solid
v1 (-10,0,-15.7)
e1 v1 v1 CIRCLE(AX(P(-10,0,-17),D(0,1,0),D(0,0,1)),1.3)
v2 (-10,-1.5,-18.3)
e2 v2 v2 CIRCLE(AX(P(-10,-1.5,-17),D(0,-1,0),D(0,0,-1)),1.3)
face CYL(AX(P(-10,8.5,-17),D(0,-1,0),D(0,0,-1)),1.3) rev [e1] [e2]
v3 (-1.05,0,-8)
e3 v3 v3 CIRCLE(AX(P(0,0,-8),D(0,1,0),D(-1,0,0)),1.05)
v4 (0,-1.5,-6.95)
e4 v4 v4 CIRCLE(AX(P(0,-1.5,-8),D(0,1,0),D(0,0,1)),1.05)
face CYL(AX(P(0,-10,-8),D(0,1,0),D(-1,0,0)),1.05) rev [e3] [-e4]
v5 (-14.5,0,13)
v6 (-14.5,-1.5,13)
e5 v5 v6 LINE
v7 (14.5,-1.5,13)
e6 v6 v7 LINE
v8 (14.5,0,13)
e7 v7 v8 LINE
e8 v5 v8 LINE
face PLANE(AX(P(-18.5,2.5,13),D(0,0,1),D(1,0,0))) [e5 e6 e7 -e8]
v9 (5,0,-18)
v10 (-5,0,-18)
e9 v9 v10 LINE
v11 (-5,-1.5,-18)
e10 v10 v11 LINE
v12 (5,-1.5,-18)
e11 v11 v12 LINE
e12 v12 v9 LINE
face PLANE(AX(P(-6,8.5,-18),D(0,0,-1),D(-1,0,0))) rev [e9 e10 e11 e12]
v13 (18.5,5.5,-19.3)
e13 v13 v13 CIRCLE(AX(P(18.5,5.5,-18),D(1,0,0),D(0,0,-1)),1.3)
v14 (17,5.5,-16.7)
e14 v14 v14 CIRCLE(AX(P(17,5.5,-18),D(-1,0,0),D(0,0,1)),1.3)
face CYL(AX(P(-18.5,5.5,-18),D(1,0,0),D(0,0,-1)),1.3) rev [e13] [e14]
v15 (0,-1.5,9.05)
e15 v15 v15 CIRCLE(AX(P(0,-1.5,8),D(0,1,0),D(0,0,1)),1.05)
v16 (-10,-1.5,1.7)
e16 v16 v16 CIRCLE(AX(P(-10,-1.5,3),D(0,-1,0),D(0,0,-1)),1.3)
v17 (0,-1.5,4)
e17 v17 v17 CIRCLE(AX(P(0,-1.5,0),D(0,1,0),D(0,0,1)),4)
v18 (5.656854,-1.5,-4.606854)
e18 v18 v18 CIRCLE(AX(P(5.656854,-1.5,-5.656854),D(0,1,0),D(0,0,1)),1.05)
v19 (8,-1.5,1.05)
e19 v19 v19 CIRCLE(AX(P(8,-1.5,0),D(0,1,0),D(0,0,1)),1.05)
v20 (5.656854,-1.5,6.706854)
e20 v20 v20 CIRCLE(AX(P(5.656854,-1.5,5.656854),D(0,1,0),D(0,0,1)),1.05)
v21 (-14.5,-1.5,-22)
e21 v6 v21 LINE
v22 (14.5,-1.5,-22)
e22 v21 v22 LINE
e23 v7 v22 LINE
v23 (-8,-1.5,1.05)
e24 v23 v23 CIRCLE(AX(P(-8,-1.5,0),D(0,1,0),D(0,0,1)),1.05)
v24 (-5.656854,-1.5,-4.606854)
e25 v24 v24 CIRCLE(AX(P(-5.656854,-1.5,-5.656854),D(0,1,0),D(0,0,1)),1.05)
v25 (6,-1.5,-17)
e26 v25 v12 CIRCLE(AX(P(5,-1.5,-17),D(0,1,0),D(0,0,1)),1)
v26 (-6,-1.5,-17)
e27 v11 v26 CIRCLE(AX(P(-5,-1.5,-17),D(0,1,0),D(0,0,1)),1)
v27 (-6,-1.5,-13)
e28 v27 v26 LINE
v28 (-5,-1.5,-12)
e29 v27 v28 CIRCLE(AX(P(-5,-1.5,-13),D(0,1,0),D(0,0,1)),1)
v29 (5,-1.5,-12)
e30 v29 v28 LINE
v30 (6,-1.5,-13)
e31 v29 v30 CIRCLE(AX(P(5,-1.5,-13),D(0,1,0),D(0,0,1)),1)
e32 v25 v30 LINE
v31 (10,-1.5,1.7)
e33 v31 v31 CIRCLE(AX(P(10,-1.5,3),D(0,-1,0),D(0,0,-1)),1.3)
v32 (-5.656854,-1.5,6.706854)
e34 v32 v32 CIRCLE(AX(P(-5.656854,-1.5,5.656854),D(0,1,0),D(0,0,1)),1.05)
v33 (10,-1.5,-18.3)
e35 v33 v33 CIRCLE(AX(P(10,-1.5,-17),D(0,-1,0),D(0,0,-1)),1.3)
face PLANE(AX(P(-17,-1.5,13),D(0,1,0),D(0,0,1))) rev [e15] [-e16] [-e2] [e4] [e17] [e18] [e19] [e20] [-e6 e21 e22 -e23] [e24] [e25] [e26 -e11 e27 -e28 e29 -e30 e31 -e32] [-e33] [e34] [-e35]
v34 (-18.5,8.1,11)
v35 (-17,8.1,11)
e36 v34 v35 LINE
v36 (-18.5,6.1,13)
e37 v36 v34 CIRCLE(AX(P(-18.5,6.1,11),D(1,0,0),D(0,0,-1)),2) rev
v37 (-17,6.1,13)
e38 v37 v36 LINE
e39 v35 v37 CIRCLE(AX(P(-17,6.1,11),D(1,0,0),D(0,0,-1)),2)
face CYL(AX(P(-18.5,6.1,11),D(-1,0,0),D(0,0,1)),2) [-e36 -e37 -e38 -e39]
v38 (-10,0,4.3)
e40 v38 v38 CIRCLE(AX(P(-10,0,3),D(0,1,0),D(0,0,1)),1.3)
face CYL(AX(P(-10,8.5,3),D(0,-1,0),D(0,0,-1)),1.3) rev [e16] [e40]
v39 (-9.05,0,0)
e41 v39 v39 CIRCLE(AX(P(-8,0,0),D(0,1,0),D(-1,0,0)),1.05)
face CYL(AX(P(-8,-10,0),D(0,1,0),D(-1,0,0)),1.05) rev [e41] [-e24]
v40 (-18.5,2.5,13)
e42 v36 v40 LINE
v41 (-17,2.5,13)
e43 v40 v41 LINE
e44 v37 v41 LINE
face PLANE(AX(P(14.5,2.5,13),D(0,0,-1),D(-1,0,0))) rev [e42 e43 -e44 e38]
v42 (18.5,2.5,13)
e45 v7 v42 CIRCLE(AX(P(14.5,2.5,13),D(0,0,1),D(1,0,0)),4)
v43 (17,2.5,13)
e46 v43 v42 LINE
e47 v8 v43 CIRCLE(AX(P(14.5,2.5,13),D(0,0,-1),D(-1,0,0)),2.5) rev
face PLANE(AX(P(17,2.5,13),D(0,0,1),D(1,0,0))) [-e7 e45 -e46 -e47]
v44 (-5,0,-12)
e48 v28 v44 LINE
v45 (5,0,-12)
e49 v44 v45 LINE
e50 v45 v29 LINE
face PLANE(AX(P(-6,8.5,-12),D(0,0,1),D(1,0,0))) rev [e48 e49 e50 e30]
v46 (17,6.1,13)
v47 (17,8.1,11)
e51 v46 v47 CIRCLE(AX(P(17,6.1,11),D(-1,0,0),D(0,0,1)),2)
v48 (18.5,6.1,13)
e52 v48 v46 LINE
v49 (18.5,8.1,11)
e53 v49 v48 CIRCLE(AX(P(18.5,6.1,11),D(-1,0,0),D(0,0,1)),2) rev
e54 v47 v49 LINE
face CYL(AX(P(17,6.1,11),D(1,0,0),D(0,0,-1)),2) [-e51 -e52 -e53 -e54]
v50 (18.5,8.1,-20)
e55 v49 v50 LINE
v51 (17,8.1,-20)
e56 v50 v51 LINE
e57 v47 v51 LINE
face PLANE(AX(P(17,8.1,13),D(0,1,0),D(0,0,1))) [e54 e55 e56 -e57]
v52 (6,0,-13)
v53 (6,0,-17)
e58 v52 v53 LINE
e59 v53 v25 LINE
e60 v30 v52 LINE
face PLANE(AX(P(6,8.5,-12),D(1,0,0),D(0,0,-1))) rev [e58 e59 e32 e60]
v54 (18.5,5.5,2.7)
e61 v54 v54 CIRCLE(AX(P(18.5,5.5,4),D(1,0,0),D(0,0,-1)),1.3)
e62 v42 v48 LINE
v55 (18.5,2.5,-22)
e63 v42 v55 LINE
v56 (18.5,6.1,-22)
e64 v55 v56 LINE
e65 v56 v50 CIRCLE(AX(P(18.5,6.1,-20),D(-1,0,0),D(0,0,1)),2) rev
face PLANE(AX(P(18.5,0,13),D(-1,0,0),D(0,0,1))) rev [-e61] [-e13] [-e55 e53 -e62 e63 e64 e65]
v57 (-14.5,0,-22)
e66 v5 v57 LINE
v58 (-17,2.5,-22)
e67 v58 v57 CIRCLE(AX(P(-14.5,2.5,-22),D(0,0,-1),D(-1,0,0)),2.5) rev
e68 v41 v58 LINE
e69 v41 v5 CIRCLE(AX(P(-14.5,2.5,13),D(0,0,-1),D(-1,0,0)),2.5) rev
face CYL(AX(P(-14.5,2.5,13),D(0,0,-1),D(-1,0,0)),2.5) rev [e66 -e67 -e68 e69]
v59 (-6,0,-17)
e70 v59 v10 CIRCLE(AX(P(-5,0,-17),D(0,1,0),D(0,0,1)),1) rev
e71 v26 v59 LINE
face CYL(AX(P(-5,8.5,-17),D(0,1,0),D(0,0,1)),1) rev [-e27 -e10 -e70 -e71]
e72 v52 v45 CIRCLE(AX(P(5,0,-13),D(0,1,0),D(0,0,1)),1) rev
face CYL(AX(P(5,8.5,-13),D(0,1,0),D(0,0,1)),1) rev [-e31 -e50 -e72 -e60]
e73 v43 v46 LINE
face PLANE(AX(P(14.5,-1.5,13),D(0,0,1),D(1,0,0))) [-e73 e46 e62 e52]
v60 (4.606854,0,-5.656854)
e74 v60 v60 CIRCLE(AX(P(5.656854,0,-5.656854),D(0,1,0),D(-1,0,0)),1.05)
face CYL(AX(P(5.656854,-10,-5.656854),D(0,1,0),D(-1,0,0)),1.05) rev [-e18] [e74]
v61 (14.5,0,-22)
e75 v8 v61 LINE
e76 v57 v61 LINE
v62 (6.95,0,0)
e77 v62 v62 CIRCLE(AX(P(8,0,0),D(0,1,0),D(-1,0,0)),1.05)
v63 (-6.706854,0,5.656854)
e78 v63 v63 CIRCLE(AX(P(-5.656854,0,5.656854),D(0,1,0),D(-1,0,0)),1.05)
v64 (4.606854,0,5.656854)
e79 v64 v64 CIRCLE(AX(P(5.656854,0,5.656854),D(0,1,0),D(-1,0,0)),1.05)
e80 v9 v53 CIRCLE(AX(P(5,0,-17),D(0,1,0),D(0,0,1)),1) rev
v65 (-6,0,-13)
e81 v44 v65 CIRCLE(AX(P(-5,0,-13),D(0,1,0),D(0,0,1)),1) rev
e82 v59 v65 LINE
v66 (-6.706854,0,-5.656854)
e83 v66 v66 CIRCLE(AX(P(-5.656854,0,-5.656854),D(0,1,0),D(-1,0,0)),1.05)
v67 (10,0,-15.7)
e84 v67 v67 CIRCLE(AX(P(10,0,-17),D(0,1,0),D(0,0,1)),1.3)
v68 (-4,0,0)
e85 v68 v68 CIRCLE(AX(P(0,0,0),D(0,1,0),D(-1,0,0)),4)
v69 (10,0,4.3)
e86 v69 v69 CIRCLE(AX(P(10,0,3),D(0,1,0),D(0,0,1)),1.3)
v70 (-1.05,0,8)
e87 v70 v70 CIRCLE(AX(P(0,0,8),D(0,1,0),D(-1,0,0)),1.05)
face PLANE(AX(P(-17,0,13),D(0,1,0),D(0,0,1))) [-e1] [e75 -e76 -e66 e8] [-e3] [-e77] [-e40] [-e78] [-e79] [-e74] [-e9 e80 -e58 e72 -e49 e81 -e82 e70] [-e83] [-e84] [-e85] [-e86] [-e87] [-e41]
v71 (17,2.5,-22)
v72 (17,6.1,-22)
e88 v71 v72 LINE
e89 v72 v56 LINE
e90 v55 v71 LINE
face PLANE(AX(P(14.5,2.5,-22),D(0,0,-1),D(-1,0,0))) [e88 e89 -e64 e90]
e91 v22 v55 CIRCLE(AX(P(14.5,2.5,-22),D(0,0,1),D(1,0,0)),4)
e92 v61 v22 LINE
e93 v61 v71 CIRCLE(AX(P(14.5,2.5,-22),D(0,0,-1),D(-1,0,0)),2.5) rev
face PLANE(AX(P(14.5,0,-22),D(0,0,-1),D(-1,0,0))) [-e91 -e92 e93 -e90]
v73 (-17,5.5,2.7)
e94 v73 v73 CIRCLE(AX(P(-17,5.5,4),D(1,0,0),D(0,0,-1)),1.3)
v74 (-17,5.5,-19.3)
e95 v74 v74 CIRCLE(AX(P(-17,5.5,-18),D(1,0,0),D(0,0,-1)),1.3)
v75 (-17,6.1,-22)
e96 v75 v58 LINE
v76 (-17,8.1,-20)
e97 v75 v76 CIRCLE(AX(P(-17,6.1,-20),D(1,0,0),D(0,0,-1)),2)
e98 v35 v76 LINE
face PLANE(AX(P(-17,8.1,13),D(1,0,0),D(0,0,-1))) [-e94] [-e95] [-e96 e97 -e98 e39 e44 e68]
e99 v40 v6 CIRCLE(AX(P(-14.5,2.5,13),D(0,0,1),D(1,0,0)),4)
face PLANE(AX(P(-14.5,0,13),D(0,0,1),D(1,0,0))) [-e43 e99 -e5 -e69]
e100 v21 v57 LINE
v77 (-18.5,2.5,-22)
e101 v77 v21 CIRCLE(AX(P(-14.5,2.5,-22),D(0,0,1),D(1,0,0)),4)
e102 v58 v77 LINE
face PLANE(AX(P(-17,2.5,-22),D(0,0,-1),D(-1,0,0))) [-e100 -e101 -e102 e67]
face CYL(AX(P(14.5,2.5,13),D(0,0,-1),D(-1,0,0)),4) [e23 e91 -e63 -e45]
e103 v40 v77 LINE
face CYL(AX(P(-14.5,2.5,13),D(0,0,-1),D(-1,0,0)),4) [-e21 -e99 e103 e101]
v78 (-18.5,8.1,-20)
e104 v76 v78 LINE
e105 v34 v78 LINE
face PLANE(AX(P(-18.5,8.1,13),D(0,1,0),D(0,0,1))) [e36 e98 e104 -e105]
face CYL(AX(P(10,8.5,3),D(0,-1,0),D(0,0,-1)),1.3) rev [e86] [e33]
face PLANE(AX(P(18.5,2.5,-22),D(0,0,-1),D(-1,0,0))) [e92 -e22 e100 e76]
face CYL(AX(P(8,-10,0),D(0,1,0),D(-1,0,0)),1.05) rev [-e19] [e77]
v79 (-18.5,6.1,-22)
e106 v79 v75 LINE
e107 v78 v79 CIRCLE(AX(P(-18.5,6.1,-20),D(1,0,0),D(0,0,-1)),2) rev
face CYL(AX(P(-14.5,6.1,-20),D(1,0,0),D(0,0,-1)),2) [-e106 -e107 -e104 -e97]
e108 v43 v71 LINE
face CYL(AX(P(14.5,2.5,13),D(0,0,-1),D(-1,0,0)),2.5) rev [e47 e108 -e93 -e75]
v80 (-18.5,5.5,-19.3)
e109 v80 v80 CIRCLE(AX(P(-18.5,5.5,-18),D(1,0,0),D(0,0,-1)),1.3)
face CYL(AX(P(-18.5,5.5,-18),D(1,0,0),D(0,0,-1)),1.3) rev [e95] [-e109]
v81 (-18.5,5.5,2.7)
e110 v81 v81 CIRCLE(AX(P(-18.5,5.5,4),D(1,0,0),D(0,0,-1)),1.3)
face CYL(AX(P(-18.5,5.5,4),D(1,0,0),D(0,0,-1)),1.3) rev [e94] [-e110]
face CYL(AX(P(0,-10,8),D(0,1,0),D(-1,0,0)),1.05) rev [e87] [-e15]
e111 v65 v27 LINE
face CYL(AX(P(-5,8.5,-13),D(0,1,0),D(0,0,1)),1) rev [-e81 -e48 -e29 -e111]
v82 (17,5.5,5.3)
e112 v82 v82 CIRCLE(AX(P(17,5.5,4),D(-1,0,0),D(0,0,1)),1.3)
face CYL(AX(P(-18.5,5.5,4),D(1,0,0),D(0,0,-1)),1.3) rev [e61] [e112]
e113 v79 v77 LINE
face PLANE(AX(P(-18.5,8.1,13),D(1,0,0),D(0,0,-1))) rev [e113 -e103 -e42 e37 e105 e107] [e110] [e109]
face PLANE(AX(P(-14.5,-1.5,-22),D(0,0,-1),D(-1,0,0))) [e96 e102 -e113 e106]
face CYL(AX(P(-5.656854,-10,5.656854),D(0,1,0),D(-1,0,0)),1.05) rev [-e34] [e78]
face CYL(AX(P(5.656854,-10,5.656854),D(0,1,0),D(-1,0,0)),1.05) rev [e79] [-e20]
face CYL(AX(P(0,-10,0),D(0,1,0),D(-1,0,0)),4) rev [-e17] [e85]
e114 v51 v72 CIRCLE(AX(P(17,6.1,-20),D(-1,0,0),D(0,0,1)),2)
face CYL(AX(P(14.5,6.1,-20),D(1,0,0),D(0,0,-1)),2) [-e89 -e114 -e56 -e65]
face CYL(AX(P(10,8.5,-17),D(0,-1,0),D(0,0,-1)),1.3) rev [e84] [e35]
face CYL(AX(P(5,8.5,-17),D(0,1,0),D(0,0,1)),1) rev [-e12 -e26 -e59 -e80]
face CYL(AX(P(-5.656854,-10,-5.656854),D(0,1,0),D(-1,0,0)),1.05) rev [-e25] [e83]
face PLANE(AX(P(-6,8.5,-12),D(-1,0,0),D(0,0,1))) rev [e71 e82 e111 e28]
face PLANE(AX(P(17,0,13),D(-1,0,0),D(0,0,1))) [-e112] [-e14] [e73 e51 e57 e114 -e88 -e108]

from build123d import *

# Parameters (mm, degrees)
BASE_FLANGE1_DEPTH      = 13
BASE_FLANGE1_DEPTH_BACK = 22
SKETCH5_R               = 4
SKETCH5_R_2             = 1.05
CUT_EXTRUDE1_DEPTH      = 10
CUT_EXTRUDE2_DEPTH      = 30.864025181
CUT_EXTRUDE2_DEPTH_BACK = 30.864025181
SKETCH7_R               = 1.3
FILLET1_R               = 2
SKETCH8_R               = 1.3
CUT_EXTRUDE3_DEPTH      = 10
SKETCH9_W               = 12
SKETCH9_H               = 6
CUT_EXTRUDE4_DEPTH      = 10
FILLET2_R               = 1


# Sheet-metal steps are written as plain solids
with BuildPart() as part:
    # Sketch1 → Base-Flange1 (new, two sides: drawn at the far end of the back side and taken through both)
    with BuildSketch(Plane.XY.offset(-BASE_FLANGE1_DEPTH_BACK)):
        with BuildLine():
            Line((-17, 8.1), (-17, 2.5))
            ThreePointArc((-17, 2.5), (-16.267766953, 0.732233047), (-14.5, 0))
            Line((-14.5, 0), (14.5, 0))
            ThreePointArc((14.5, 0), (16.267766953, 0.732233047), (17, 2.5))
            Line((17, 2.5), (17, 8.1))
            Line((17, 8.1), (18.5, 8.1))
            Line((18.5, 8.1), (18.5, 2.5))
            ThreePointArc((18.5, 2.5), (17.328427125, -0.328427125), (14.5, -1.5))
            Line((14.5, -1.5), (-14.5, -1.5))
            ThreePointArc((-14.5, -1.5), (-17.328427125, -0.328427125), (-18.5, 2.5))
            Line((-18.5, 2.5), (-18.5, 8.1))
            Line((-18.5, 8.1), (-17, 8.1))
        make_face()
    extrude(amount=BASE_FLANGE1_DEPTH + BASE_FLANGE1_DEPTH_BACK)

    # Sketch5 → Cut-Extrude1 (cut)
    with BuildSketch(Plane(origin=(0, 0, 0), x_dir=(1, 0, 0), z_dir=(0, 1, 0))):
        with Locations(Location((0, 0, 0), (0, 0, 180))):
            Circle(SKETCH5_R)
        with Locations(Location((0, 8, 0), (0, 0, 180))):
            Circle(SKETCH5_R_2)
        with Locations(Location((5.656854249, 5.656854249, 0), (0, 0, 180))):
            Circle(SKETCH5_R_2)
        with Locations(Location((8, 0, 0), (0, 0, 180))):
            Circle(SKETCH5_R_2)
        with Locations(Location((5.656854249, -5.656854249, 0), (0, 0, 180))):
            Circle(SKETCH5_R_2)
        with Locations(Location((0, -8, 0), (0, 0, 180))):
            Circle(SKETCH5_R_2)
        with Locations(Location((-5.656854249, -5.656854249, 0), (0, 0, 180))):
            Circle(SKETCH5_R_2)
        with Locations(Location((-8, 0, 0), (0, 0, 180))):
            Circle(SKETCH5_R_2)
        with Locations(Location((-5.656854249, 5.656854249, 0), (0, 0, 180))):
            Circle(SKETCH5_R_2)
    extrude(amount=-CUT_EXTRUDE1_DEPTH, mode=Mode.SUBTRACT)

    # Sketch7 → Cut-Extrude2 (cut, two sides: drawn at the far end of the back side and taken through both)
    with BuildSketch(Plane(origin=(0, 0, 0), x_dir=(0, 0, -1), z_dir=(1, 0, 0)).offset(-CUT_EXTRUDE2_DEPTH_BACK)):
        with Locations((-4, 5.5)):
            Circle(SKETCH7_R)
        with Locations((18, 5.5)):
            Circle(SKETCH7_R)
    extrude(amount=CUT_EXTRUDE2_DEPTH + CUT_EXTRUDE2_DEPTH_BACK, mode=Mode.SUBTRACT)

    # Fillet1
    fillet1_edges = [part.edges().sort_by_distance(p)[0] for p in [
        (-17.75, 8.1, 13),
        (-17.75, 8.1, -22),
        (17.75, 8.1, -22),
        (17.75, 8.1, 13),
    ]]
    fillet(fillet1_edges, radius=FILLET1_R)

    # Sketch8 → Cut-Extrude3 (cut)
    with BuildSketch(Plane.XZ.offset(1.5)):
        with Locations(Location((-10, 3, 0), (0, 0, 270))):
            Circle(SKETCH8_R)
        with Locations(Location((10, 3, 0), (0, 0, 270))):
            Circle(SKETCH8_R)
        with Locations(Location((10, -17, 0), (0, 0, 270))):
            Circle(SKETCH8_R)
        with Locations(Location((-10, -17, 0), (0, 0, 270))):
            Circle(SKETCH8_R)
    extrude(amount=-CUT_EXTRUDE3_DEPTH, mode=Mode.SUBTRACT)

    # Sketch9 → Cut-Extrude4 (cut)
    with BuildSketch(Plane.XZ.offset(1.5)):
        with Locations((0, -15)):
            Rectangle(SKETCH9_W, SKETCH9_H)
    extrude(amount=-CUT_EXTRUDE4_DEPTH, mode=Mode.SUBTRACT)

    # Fillet2
    fillet2_edges = [part.edges().sort_by_distance(p)[0] for p in [
        (6, -0.75, -12),
        (6, -0.75, -18),
        (-6, -0.75, -18),
        (-6, -0.75, -12),
    ]]
    fillet(fillet2_edges, radius=FILLET2_R)


solid = part.part
